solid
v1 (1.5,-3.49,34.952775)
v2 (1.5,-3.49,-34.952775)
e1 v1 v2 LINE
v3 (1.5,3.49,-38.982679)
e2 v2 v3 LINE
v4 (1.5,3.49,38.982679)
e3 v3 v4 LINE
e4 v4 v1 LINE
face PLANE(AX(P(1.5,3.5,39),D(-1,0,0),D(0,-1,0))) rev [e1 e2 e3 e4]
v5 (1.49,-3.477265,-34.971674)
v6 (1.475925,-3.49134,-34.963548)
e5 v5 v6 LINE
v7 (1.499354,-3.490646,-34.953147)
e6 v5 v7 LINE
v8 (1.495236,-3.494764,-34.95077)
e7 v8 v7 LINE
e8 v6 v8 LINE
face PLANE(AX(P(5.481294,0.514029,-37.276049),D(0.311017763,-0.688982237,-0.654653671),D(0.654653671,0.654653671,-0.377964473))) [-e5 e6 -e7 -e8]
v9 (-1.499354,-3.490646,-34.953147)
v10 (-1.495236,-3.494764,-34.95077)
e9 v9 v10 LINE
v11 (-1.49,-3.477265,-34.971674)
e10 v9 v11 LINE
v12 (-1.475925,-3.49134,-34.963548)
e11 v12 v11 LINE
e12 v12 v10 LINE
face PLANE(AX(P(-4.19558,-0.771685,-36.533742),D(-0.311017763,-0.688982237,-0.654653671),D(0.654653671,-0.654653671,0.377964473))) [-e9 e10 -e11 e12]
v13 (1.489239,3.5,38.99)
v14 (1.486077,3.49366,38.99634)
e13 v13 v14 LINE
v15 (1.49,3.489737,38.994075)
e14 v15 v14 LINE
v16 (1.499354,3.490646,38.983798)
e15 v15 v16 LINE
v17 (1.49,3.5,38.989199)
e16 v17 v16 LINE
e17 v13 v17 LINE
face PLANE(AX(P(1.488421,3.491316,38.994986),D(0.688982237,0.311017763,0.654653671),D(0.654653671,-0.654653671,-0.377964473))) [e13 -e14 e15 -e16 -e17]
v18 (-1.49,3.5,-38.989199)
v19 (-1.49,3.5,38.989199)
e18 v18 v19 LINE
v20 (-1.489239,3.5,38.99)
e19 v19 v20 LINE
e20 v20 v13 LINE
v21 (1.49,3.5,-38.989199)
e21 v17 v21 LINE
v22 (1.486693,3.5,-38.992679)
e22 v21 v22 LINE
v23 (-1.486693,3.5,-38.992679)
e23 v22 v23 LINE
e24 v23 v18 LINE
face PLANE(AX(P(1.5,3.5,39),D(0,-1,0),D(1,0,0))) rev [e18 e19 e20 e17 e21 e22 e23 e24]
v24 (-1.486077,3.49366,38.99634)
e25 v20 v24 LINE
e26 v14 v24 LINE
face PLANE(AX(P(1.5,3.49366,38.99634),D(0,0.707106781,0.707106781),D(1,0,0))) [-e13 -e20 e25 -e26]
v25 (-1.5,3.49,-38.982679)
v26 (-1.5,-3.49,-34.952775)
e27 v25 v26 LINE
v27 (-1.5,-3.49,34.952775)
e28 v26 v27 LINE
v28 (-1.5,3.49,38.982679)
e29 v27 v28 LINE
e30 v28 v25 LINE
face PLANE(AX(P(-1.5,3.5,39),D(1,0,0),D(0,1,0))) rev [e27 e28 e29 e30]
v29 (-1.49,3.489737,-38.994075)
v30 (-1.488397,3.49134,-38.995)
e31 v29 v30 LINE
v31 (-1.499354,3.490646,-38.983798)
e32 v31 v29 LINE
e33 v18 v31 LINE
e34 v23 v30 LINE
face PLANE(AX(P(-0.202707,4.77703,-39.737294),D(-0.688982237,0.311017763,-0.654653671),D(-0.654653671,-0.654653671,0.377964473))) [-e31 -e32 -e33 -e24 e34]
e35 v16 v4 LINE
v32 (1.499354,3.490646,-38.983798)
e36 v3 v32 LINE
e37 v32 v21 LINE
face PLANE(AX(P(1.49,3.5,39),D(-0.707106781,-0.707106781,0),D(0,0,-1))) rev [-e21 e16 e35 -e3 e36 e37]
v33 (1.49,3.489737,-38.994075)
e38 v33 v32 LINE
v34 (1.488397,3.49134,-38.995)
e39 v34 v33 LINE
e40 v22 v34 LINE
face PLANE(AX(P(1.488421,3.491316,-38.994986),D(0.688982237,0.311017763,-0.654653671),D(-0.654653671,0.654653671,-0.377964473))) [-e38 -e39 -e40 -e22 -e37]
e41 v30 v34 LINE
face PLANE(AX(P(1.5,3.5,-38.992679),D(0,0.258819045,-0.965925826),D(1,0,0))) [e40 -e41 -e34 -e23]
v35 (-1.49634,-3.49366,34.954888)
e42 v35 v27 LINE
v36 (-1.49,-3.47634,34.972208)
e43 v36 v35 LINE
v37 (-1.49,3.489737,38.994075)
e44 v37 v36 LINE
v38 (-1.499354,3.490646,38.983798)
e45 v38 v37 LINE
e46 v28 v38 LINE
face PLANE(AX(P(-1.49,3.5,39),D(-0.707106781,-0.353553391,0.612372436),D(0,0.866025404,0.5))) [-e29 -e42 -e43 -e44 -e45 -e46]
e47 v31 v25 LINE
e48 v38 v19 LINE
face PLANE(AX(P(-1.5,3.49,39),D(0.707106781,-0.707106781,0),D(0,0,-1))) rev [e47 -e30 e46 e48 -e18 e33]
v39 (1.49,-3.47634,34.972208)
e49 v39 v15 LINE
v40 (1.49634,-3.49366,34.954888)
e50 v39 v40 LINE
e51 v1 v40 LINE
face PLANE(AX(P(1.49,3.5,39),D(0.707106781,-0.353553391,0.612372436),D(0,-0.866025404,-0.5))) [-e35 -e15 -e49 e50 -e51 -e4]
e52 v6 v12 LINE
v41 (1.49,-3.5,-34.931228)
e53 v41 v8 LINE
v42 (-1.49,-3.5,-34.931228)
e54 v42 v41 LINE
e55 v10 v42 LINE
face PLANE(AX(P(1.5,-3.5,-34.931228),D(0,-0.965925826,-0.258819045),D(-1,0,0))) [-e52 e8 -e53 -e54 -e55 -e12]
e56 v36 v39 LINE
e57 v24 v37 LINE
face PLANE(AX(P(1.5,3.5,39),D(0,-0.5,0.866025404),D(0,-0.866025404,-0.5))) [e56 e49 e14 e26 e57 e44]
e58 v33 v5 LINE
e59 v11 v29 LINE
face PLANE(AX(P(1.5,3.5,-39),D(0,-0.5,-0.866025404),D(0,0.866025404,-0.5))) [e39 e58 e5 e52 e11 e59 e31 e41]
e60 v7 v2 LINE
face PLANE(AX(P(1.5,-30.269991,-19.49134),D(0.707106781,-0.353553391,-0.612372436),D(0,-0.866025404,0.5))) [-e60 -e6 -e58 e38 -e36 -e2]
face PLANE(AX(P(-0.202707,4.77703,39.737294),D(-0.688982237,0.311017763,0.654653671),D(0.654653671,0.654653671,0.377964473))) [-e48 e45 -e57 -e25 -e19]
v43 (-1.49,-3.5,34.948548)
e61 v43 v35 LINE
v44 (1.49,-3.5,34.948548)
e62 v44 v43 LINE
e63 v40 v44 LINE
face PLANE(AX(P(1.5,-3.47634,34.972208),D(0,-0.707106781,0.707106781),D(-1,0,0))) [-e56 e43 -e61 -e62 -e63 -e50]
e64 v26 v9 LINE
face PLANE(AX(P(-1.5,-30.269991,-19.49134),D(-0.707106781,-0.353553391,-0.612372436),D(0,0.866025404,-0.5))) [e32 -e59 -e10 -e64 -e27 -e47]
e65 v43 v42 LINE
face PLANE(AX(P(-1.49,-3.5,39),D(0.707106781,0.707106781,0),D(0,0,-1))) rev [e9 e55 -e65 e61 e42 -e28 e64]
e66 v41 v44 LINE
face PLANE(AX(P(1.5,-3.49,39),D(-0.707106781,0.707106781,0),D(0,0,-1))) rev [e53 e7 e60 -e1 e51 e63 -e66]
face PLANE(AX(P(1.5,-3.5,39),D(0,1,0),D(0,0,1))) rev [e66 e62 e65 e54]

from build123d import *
from OCP.BRepFilletAPI import BRepFilletAPI_MakeChamfer

# Parameters (mm, degrees)
SKETCH1_W           = 3
SKETCH1_H           = 7
BOSS_EXTRUDE1_DEPTH = 39
DRAFT1_ANGLE        = -30
DRAFT2_ANGLE        = -30
CHAMFER1_SIZE       = 0.01
CHAMFER2_SIZE       = 0.007320508
CHAMFER2_SIZE_2     = 0.01
CHAMFER2_SIZE_3     = 0.027320508
CHAMFER2_SIZE_4     = 0.007758146
CHAMFER2_SIZE_5     = 0.017186236


with BuildPart() as part:
    # Sketch1 → Boss-Extrude1 (new, symmetric)
    with BuildSketch(Plane.XY):
        Rectangle(SKETCH1_W, SKETCH1_H)
    extrude(amount=BOSS_EXTRUDE1_DEPTH, both=True)

    # Draft1
    draft1_faces = [part.faces().sort_by_distance(p)[0] for p in [
        (0, 0, 39),
    ]]
    draft(draft1_faces, Plane(origin=(1.5, 3.5, 39), x_dir=(1, 0, 0), z_dir=(0, 1, 0)), DRAFT1_ANGLE)

    # Draft2
    draft2_faces = [part.faces().sort_by_distance(p)[0] for p in [
        (0, 0, -39),
    ]]
    draft(draft2_faces, Plane(origin=(1.5, 3.5, 39), x_dir=(1, 0, 0), z_dir=(0, 1, 0)), DRAFT2_ANGLE)

    # Chamfer1
    chamfer1_edges = [part.edges().sort_by_distance(p)[0] for p in [
        (-1.5, 3.5, 0),
        (1.5, 3.5, 0),
        (1.5, -3.5, 0),
        (-1.5, -3.5, 0),
    ]]
    chamfer(chamfer1_edges, length=CHAMFER1_SIZE)

    # Chamfer2
    chamfer2_edges_1 = [part.edges().sort_by_distance(p)[0] for p in [
        (0, 3.5, -39),
    ]]
    chamfer2_side_1 = [part.faces().sort_by_distance(p)[0] for p in [
        (0, 3.5, -38.99985359),
    ]]
    chamfer2_edges_2 = [part.edges().sort_by_distance(p)[0] for p in [
        (0, -3.5, -34.958548116),
    ]]
    chamfer2_side_2 = [part.faces().sort_by_distance(p)[0] for p in [
        (0, -3.499826795, -34.958648116),
    ]]
    chamfer2_edges_3 = [part.edges().sort_by_distance(p)[0] for p in [
        (1.495, 3.495, -38.997113249),
    ]]
    chamfer2_side_3 = [part.faces().sort_by_distance(p)[0] for p in [
        (1.494882708, 3.494912031, -38.99706246),
    ]]
    chamfer2_edges_4 = [part.edges().sort_by_distance(p)[0] for p in [
        (1.495, 3.495, 38.997113249),
    ]]
    chamfer2_side_4 = [part.faces().sort_by_distance(p)[0] for p in [
        (1.494958531, 3.495041469, 38.996969596),
    ]]
    chamfer2_edges_5 = [part.edges().sort_by_distance(p)[0] for p in [
        (-1.495, 3.495, -38.997113249),
    ]]
    chamfer2_side_5 = [part.faces().sort_by_distance(p)[0] for p in [
        (-1.494882708, 3.494912031, -38.99706246),
    ]]
    chamfer2_edges_6 = [part.edges().sort_by_distance(p)[0] for p in [
        (-1.495, 3.495, 38.997113249),
    ]]
    chamfer2_side_6 = [part.faces().sort_by_distance(p)[0] for p in [
        (-1.494958531, 3.495041469, 38.996969596),
    ]]
    chamfer2_edges_7 = [part.edges().sort_by_distance(p)[0] for p in [
        (0, 3.5, 39),
    ]]
    chamfer2_side_7 = [part.faces().sort_by_distance(p)[0] for p in [
        (0, 3.5, 38.99985359),
    ]]
    chamfer2_edges_8 = [part.edges().sort_by_distance(p)[0] for p in [
        (0, -3.5, 34.958548116),
    ]]
    chamfer2_side_8 = [part.faces().sort_by_distance(p)[0] for p in [
        (0, -3.499826795, 34.958648116),
    ]]
    chamfer2 = BRepFilletAPI_MakeChamfer(part.part.solid().wrapped)
    for e in chamfer2_edges_1:
        chamfer2.Add(CHAMFER2_SIZE, CHAMFER2_SIZE_2, e.wrapped, chamfer2_side_1[0].wrapped)
    for e in chamfer2_edges_2:
        chamfer2.Add(CHAMFER2_SIZE_2, CHAMFER2_SIZE_3, e.wrapped, chamfer2_side_2[0].wrapped)
    for e in chamfer2_edges_3:
        chamfer2.Add(CHAMFER2_SIZE_4, CHAMFER2_SIZE_2, e.wrapped, chamfer2_side_3[0].wrapped)
    for e in chamfer2_edges_4:
        chamfer2.Add(CHAMFER2_SIZE_2, CHAMFER2_SIZE_4, e.wrapped, chamfer2_side_4[0].wrapped)
    for e in chamfer2_edges_5:
        chamfer2.Add(CHAMFER2_SIZE_4, CHAMFER2_SIZE_2, e.wrapped, chamfer2_side_5[0].wrapped)
    for e in chamfer2_edges_6:
        chamfer2.Add(CHAMFER2_SIZE_2, CHAMFER2_SIZE_4, e.wrapped, chamfer2_side_6[0].wrapped)
    for e in chamfer2_edges_7:
        chamfer2.Add(CHAMFER2_SIZE_2, CHAMFER2_SIZE, e.wrapped, chamfer2_side_7[0].wrapped)
    for e in chamfer2_edges_8:
        chamfer2.Add(CHAMFER2_SIZE_3, CHAMFER2_SIZE_2, e.wrapped, chamfer2_side_8[0].wrapped)
    add(Compound.cast(chamfer2.Shape()), mode=Mode.REPLACE)
    chamfer2_2_edges_1 = [part.edges().sort_by_distance(p)[0] for p in [
        (1.499330127, -3.490669873, -34.963934867),
    ]]
    chamfer2_2_side_1 = [part.faces().sort_by_distance(p)[0] for p in [
        (1.499178941, -3.490556484, -34.964000332),
    ]]
    chamfer2_2_edges_2 = [part.edges().sort_by_distance(p)[0] for p in [
        (-1.499330127, -3.490669873, -34.963934867),
    ]]
    chamfer2_2_side_2 = [part.faces().sort_by_distance(p)[0] for p in [
        (-1.499178941, -3.490556484, -34.964000332),
    ]]
    chamfer2_2 = BRepFilletAPI_MakeChamfer(part.part.solid().wrapped)
    for e in chamfer2_2_edges_1:
        chamfer2_2.Add(CHAMFER2_SIZE_5, CHAMFER2_SIZE_2, e.wrapped, chamfer2_2_side_1[0].wrapped)
    for e in chamfer2_2_edges_2:
        chamfer2_2.Add(CHAMFER2_SIZE_5, CHAMFER2_SIZE_2, e.wrapped, chamfer2_2_side_2[0].wrapped)
    add(Compound.cast(chamfer2_2.Shape()), mode=Mode.REPLACE)
    chamfer2_3_edges = [part.edges().sort_by_distance(p)[0] for p in [
        (-1.5, 0.006236096, -36.982874469),
        (-1.5, 0.001698596, 36.980254743),
        (1.5, 0.006236096, -36.982874469),
        (1.5, 0.001698596, 36.980254743),
    ]]
    chamfer(chamfer2_3_edges, length=CHAMFER2_SIZE_2)


solid = part.part
